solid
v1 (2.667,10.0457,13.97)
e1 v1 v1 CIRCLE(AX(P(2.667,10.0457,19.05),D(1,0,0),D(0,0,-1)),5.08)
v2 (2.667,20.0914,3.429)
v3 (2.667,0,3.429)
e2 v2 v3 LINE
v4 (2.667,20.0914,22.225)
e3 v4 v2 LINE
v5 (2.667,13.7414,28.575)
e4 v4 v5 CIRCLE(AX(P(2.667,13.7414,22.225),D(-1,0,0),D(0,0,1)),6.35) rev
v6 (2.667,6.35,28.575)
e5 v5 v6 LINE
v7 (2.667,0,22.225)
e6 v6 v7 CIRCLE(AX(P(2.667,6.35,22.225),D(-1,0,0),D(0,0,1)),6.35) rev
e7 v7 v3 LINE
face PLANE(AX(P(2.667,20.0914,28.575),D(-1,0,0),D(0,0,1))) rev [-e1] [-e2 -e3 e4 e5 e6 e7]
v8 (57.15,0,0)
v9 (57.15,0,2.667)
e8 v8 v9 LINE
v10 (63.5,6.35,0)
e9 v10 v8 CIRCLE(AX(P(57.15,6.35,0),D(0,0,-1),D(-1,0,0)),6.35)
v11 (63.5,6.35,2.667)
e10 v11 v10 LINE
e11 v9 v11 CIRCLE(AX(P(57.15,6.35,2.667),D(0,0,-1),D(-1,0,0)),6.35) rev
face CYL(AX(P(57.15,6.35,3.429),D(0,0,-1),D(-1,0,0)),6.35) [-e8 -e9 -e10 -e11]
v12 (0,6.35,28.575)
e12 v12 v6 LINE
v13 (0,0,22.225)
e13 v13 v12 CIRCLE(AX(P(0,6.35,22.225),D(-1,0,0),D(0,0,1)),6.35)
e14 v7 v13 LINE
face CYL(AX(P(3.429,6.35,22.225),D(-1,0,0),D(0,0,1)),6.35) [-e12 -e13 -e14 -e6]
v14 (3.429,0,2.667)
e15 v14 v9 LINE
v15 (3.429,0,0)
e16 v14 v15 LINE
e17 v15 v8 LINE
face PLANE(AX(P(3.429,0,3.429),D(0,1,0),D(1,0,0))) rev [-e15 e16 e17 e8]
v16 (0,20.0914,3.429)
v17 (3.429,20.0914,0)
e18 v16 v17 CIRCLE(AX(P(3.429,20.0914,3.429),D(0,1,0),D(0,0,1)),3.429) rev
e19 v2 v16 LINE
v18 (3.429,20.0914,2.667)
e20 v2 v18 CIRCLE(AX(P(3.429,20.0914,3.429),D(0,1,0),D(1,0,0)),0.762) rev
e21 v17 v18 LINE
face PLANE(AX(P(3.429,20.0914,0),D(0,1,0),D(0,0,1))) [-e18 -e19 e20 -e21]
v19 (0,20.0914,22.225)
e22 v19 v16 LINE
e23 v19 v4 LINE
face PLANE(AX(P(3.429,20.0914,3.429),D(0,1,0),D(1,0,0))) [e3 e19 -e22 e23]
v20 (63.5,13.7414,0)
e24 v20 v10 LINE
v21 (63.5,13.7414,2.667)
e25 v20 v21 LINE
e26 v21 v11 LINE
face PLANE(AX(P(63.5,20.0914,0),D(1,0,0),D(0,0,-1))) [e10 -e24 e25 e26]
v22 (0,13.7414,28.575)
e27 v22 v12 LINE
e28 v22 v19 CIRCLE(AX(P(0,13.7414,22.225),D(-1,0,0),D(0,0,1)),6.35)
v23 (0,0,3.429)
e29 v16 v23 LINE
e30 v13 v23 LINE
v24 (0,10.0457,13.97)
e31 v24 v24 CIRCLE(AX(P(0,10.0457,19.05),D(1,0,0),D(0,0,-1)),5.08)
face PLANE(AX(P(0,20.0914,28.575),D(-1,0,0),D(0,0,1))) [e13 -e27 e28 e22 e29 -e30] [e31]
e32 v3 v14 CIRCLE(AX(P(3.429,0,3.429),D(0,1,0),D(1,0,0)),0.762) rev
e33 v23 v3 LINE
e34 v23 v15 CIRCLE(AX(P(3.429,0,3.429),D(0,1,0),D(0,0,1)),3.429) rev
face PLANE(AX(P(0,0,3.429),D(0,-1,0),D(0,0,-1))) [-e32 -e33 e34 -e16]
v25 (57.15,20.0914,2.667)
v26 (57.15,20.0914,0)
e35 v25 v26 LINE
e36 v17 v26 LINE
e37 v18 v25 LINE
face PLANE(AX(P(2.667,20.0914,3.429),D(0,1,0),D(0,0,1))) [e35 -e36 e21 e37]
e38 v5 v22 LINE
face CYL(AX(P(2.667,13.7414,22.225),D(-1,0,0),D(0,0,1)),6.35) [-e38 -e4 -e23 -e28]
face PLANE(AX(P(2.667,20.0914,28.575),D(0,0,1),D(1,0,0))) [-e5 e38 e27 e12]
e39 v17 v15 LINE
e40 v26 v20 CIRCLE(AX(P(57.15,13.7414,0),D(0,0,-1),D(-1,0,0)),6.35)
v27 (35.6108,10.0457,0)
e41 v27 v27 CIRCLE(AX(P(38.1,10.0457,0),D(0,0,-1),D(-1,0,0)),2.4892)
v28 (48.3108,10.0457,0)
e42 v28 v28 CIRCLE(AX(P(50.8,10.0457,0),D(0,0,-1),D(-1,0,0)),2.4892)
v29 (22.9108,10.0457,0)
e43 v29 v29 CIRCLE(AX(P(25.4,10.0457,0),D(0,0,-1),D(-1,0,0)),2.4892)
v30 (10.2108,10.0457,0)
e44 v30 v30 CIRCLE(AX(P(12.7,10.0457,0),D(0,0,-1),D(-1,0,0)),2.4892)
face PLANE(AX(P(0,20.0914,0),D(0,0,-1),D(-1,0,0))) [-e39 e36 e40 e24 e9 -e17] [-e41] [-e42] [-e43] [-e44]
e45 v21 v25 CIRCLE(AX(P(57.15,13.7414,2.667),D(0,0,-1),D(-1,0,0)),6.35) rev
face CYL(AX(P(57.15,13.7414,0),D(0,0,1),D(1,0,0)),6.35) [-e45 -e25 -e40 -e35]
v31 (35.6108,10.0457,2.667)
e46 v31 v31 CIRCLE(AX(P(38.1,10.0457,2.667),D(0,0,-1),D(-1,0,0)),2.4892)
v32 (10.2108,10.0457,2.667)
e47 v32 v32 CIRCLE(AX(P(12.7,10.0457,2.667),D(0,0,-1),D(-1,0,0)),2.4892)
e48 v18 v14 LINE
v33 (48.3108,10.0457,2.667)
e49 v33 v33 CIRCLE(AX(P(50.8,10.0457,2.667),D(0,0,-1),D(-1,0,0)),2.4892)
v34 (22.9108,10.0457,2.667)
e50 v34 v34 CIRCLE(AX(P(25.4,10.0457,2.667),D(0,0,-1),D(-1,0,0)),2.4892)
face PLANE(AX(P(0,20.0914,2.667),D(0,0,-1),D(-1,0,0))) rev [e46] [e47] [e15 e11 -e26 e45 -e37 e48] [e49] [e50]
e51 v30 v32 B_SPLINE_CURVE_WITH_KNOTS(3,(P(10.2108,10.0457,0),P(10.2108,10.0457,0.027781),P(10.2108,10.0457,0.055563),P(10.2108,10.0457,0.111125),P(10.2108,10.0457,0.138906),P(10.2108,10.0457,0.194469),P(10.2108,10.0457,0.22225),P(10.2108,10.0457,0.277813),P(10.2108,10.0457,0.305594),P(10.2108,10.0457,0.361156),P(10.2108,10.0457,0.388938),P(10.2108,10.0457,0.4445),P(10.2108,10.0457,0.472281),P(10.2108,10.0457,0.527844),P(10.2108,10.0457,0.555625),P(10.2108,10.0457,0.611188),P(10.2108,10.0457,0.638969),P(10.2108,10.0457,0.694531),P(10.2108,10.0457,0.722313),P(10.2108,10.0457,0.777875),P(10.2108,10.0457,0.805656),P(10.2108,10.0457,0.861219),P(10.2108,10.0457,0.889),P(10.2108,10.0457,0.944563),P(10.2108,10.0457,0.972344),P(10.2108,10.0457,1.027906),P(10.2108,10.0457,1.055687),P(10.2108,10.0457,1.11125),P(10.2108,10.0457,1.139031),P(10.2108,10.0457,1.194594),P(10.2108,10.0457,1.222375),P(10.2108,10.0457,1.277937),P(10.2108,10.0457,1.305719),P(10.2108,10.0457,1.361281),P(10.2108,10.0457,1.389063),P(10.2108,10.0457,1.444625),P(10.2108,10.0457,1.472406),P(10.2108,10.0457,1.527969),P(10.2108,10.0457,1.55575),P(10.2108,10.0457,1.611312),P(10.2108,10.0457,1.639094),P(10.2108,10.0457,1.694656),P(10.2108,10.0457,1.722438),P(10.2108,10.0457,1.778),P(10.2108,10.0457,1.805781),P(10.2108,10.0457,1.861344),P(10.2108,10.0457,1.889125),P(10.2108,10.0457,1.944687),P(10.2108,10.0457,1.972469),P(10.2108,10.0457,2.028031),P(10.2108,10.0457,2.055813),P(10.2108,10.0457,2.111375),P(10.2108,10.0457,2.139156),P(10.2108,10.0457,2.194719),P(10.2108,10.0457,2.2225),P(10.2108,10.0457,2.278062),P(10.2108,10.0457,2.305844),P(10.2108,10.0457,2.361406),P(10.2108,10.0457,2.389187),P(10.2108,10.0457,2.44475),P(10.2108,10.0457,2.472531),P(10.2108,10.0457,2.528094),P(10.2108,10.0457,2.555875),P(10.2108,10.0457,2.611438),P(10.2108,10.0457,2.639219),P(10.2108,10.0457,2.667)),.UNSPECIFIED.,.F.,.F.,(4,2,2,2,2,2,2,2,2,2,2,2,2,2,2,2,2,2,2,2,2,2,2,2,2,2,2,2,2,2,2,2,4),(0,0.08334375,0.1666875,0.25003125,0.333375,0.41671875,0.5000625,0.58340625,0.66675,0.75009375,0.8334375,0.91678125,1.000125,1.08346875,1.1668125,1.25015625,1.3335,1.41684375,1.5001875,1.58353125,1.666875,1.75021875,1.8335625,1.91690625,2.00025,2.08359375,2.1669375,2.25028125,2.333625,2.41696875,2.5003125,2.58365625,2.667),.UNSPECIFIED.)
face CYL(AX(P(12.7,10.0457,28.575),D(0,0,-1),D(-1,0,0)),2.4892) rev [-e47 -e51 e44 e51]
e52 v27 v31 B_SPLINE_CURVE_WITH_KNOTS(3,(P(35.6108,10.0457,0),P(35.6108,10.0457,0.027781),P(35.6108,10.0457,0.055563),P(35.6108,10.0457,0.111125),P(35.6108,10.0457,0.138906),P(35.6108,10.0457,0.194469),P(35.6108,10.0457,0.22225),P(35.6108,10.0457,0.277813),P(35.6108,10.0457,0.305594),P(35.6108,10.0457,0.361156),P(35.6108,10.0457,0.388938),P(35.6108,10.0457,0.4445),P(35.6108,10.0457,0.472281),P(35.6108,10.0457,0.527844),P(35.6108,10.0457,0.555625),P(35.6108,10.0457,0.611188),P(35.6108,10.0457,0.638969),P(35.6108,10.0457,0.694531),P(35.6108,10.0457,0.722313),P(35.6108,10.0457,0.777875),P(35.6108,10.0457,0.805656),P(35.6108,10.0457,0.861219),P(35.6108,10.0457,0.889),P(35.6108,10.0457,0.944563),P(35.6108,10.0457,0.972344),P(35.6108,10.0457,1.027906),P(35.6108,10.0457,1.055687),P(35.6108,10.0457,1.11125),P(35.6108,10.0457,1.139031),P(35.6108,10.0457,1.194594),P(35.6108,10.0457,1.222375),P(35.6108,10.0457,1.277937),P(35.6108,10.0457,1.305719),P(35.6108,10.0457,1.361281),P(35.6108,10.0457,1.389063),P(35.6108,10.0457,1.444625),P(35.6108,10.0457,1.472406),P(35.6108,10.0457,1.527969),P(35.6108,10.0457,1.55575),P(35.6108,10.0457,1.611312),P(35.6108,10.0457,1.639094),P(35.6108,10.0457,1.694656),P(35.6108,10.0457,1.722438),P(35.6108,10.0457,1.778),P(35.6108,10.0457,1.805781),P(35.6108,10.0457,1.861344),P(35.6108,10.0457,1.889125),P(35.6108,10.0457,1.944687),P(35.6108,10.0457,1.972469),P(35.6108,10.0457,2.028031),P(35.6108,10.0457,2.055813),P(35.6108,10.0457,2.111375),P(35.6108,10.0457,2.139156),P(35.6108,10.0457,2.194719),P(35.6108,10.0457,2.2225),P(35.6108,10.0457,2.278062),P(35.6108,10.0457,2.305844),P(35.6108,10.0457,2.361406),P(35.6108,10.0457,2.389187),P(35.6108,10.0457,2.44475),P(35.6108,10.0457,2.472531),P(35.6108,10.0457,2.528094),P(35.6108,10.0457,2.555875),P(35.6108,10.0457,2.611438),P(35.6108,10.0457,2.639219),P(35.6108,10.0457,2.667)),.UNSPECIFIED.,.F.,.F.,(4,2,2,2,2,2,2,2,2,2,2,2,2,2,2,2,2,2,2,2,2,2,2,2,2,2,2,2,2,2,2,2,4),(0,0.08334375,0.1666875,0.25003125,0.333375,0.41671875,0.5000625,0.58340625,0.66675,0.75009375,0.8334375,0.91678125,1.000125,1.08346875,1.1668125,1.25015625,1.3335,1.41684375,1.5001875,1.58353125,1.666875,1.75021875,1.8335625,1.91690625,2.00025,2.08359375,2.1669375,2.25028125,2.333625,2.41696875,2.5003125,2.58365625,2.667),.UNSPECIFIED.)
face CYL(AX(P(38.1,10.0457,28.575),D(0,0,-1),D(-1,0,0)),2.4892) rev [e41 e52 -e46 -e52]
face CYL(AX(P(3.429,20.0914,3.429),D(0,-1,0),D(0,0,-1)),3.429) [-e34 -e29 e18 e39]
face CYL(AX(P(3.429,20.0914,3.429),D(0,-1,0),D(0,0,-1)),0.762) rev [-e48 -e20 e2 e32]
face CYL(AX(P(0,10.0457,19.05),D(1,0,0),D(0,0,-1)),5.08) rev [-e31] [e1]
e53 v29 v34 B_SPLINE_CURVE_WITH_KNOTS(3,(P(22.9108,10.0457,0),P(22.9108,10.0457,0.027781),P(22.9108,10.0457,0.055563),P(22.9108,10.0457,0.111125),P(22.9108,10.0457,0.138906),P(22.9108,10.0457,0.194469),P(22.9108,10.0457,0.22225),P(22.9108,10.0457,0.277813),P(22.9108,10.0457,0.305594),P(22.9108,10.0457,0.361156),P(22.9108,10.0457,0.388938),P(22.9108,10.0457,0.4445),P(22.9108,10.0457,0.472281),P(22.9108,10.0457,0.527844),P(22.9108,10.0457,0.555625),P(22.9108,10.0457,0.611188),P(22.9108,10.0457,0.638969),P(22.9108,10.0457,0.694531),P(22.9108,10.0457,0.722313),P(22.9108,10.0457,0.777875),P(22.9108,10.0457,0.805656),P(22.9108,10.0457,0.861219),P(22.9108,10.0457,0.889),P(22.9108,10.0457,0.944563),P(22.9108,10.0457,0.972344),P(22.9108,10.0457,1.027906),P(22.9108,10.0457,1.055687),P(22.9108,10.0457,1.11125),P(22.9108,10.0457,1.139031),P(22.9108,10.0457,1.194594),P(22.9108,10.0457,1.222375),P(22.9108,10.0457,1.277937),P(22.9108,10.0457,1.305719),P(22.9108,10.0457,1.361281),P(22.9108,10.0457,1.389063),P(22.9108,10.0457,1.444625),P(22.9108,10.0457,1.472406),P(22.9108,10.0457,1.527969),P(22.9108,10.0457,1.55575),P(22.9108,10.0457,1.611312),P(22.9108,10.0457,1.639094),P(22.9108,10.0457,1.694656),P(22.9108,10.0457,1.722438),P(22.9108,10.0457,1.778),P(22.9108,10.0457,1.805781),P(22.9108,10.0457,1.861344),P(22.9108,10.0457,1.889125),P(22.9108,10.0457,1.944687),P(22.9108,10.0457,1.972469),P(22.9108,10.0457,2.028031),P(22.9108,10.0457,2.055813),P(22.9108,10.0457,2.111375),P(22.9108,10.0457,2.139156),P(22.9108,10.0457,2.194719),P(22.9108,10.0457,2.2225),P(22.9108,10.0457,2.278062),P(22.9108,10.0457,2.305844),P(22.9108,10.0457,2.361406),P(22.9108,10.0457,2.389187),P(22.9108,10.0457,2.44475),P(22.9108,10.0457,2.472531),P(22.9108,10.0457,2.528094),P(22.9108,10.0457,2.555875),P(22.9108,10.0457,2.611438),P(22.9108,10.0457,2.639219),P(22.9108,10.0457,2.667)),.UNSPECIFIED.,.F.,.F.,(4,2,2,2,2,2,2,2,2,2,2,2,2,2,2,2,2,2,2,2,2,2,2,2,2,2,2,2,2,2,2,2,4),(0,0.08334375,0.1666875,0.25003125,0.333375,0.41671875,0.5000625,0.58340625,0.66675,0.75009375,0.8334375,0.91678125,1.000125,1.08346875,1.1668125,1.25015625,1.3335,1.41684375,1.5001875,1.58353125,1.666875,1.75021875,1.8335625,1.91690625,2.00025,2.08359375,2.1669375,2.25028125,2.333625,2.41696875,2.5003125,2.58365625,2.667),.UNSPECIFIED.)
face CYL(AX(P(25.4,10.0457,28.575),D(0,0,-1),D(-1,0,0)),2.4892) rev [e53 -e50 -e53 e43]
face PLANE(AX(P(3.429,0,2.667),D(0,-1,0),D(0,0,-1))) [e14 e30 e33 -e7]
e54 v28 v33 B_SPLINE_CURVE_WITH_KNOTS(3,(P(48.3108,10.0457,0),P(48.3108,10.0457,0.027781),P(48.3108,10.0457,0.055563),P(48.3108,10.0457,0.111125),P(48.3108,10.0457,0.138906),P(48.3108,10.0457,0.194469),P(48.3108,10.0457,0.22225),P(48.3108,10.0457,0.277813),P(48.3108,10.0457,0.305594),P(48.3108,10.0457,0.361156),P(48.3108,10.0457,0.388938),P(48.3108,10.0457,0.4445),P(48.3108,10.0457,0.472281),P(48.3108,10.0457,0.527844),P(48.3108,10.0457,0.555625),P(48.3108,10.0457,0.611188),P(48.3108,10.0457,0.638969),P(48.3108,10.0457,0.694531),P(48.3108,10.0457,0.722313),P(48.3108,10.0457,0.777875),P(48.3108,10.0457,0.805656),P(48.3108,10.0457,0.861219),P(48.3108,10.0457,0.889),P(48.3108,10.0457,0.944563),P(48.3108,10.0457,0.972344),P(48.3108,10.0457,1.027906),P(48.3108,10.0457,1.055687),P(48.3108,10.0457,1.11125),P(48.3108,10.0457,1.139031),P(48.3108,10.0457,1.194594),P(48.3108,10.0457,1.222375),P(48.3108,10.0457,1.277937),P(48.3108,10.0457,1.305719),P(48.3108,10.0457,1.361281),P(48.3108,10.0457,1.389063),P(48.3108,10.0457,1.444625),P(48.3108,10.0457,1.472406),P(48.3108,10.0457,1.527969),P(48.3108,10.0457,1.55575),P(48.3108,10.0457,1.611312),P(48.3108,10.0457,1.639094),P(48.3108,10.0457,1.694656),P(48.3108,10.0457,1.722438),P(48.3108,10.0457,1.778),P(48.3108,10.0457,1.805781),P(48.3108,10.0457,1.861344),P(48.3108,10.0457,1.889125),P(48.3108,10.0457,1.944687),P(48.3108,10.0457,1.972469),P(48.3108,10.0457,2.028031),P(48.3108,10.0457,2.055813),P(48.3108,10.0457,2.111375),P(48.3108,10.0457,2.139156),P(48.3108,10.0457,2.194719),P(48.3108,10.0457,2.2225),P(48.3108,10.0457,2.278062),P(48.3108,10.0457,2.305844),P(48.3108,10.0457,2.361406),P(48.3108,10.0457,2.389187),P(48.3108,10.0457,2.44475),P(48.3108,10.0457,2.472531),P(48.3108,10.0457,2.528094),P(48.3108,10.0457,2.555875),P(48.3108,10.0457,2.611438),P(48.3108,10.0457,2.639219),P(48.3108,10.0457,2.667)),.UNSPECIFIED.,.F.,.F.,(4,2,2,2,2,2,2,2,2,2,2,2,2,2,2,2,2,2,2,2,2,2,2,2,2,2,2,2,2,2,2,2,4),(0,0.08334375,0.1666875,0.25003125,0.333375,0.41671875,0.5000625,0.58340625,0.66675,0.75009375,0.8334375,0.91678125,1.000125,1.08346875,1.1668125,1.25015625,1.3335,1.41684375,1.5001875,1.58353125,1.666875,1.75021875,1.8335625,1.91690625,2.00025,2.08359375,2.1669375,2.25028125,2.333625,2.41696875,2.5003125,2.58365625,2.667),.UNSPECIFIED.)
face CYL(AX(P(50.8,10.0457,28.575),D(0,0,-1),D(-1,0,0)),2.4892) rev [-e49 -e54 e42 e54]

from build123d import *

# Parameters (mm, degrees)
BASE_FLANGE1_DEPTH = 20.0914
SKETCH6_R          = 5.08
CUT_EXTRUDE1_DEPTH = 71.148762412
FILLET1_R          = 6.35
SKETCH7_R          = 2.4892
CUT_EXTRUDE2_DEPTH = 73.473753725


# Sheet-metal steps are written as plain solids
with BuildPart() as part:
    # Sketch1 → Base-Flange1 (new body)
    with BuildSketch(Plane(origin=(0, 0, 0), x_dir=(1, 0, 0), z_dir=(0, 1, 0))):
        with BuildLine():
            Line((0, -28.575), (0, -3.429))
            ThreePointArc((0, -3.429), (1.004330847, -1.004330847), (3.429, 0))
            Line((3.429, 0), (63.5, 0))
            Line((63.5, 0), (63.5, -2.667))
            Line((63.5, -2.667), (3.429, -2.667))
            ThreePointArc((3.429, -2.667), (2.890184633, -2.890184633), (2.667, -3.429))
            Line((2.667, -3.429), (2.667, -28.575))
            Line((2.667, -28.575), (0, -28.575))
        make_face()
    extrude(amount=BASE_FLANGE1_DEPTH)

    # Sketch6 → Cut-Extrude1 (cut, through all)
    with BuildSketch(Plane(origin=(2.667, 0, 0), x_dir=(0, 0, -1), z_dir=(1, 0, 0))):
        with Locations((-19.05, 10.0457)):
            Circle(SKETCH6_R)
    extrude(amount=-CUT_EXTRUDE1_DEPTH, mode=Mode.SUBTRACT)

    # Fillet1
    fillet1_edges = [part.edges().sort_by_distance(p)[0] for p in [
        (1.3335, 20.0914, 28.575),
        (1.3335, 0, 28.575),
        (63.5, 20.0914, 1.3335),
        (63.5, 0, 1.3335),
    ]]
    fillet(fillet1_edges, radius=FILLET1_R)

    # Sketch7 → Cut-Extrude2 (cut, through all)
    with BuildSketch(Plane(origin=(0, 0, 0), x_dir=(-1, 0, 0), z_dir=(0, 0, -1))):
        with Locations((-50.8, 10.0457)):
            Circle(SKETCH7_R)
        with Locations((-38.1, 10.0457)):
            Circle(SKETCH7_R)
        with Locations((-25.4, 10.0457)):
            Circle(SKETCH7_R)
        with Locations((-12.7, 10.0457)):
            Circle(SKETCH7_R)
    extrude(amount=-CUT_EXTRUDE2_DEPTH, mode=Mode.SUBTRACT)


solid = part.part
